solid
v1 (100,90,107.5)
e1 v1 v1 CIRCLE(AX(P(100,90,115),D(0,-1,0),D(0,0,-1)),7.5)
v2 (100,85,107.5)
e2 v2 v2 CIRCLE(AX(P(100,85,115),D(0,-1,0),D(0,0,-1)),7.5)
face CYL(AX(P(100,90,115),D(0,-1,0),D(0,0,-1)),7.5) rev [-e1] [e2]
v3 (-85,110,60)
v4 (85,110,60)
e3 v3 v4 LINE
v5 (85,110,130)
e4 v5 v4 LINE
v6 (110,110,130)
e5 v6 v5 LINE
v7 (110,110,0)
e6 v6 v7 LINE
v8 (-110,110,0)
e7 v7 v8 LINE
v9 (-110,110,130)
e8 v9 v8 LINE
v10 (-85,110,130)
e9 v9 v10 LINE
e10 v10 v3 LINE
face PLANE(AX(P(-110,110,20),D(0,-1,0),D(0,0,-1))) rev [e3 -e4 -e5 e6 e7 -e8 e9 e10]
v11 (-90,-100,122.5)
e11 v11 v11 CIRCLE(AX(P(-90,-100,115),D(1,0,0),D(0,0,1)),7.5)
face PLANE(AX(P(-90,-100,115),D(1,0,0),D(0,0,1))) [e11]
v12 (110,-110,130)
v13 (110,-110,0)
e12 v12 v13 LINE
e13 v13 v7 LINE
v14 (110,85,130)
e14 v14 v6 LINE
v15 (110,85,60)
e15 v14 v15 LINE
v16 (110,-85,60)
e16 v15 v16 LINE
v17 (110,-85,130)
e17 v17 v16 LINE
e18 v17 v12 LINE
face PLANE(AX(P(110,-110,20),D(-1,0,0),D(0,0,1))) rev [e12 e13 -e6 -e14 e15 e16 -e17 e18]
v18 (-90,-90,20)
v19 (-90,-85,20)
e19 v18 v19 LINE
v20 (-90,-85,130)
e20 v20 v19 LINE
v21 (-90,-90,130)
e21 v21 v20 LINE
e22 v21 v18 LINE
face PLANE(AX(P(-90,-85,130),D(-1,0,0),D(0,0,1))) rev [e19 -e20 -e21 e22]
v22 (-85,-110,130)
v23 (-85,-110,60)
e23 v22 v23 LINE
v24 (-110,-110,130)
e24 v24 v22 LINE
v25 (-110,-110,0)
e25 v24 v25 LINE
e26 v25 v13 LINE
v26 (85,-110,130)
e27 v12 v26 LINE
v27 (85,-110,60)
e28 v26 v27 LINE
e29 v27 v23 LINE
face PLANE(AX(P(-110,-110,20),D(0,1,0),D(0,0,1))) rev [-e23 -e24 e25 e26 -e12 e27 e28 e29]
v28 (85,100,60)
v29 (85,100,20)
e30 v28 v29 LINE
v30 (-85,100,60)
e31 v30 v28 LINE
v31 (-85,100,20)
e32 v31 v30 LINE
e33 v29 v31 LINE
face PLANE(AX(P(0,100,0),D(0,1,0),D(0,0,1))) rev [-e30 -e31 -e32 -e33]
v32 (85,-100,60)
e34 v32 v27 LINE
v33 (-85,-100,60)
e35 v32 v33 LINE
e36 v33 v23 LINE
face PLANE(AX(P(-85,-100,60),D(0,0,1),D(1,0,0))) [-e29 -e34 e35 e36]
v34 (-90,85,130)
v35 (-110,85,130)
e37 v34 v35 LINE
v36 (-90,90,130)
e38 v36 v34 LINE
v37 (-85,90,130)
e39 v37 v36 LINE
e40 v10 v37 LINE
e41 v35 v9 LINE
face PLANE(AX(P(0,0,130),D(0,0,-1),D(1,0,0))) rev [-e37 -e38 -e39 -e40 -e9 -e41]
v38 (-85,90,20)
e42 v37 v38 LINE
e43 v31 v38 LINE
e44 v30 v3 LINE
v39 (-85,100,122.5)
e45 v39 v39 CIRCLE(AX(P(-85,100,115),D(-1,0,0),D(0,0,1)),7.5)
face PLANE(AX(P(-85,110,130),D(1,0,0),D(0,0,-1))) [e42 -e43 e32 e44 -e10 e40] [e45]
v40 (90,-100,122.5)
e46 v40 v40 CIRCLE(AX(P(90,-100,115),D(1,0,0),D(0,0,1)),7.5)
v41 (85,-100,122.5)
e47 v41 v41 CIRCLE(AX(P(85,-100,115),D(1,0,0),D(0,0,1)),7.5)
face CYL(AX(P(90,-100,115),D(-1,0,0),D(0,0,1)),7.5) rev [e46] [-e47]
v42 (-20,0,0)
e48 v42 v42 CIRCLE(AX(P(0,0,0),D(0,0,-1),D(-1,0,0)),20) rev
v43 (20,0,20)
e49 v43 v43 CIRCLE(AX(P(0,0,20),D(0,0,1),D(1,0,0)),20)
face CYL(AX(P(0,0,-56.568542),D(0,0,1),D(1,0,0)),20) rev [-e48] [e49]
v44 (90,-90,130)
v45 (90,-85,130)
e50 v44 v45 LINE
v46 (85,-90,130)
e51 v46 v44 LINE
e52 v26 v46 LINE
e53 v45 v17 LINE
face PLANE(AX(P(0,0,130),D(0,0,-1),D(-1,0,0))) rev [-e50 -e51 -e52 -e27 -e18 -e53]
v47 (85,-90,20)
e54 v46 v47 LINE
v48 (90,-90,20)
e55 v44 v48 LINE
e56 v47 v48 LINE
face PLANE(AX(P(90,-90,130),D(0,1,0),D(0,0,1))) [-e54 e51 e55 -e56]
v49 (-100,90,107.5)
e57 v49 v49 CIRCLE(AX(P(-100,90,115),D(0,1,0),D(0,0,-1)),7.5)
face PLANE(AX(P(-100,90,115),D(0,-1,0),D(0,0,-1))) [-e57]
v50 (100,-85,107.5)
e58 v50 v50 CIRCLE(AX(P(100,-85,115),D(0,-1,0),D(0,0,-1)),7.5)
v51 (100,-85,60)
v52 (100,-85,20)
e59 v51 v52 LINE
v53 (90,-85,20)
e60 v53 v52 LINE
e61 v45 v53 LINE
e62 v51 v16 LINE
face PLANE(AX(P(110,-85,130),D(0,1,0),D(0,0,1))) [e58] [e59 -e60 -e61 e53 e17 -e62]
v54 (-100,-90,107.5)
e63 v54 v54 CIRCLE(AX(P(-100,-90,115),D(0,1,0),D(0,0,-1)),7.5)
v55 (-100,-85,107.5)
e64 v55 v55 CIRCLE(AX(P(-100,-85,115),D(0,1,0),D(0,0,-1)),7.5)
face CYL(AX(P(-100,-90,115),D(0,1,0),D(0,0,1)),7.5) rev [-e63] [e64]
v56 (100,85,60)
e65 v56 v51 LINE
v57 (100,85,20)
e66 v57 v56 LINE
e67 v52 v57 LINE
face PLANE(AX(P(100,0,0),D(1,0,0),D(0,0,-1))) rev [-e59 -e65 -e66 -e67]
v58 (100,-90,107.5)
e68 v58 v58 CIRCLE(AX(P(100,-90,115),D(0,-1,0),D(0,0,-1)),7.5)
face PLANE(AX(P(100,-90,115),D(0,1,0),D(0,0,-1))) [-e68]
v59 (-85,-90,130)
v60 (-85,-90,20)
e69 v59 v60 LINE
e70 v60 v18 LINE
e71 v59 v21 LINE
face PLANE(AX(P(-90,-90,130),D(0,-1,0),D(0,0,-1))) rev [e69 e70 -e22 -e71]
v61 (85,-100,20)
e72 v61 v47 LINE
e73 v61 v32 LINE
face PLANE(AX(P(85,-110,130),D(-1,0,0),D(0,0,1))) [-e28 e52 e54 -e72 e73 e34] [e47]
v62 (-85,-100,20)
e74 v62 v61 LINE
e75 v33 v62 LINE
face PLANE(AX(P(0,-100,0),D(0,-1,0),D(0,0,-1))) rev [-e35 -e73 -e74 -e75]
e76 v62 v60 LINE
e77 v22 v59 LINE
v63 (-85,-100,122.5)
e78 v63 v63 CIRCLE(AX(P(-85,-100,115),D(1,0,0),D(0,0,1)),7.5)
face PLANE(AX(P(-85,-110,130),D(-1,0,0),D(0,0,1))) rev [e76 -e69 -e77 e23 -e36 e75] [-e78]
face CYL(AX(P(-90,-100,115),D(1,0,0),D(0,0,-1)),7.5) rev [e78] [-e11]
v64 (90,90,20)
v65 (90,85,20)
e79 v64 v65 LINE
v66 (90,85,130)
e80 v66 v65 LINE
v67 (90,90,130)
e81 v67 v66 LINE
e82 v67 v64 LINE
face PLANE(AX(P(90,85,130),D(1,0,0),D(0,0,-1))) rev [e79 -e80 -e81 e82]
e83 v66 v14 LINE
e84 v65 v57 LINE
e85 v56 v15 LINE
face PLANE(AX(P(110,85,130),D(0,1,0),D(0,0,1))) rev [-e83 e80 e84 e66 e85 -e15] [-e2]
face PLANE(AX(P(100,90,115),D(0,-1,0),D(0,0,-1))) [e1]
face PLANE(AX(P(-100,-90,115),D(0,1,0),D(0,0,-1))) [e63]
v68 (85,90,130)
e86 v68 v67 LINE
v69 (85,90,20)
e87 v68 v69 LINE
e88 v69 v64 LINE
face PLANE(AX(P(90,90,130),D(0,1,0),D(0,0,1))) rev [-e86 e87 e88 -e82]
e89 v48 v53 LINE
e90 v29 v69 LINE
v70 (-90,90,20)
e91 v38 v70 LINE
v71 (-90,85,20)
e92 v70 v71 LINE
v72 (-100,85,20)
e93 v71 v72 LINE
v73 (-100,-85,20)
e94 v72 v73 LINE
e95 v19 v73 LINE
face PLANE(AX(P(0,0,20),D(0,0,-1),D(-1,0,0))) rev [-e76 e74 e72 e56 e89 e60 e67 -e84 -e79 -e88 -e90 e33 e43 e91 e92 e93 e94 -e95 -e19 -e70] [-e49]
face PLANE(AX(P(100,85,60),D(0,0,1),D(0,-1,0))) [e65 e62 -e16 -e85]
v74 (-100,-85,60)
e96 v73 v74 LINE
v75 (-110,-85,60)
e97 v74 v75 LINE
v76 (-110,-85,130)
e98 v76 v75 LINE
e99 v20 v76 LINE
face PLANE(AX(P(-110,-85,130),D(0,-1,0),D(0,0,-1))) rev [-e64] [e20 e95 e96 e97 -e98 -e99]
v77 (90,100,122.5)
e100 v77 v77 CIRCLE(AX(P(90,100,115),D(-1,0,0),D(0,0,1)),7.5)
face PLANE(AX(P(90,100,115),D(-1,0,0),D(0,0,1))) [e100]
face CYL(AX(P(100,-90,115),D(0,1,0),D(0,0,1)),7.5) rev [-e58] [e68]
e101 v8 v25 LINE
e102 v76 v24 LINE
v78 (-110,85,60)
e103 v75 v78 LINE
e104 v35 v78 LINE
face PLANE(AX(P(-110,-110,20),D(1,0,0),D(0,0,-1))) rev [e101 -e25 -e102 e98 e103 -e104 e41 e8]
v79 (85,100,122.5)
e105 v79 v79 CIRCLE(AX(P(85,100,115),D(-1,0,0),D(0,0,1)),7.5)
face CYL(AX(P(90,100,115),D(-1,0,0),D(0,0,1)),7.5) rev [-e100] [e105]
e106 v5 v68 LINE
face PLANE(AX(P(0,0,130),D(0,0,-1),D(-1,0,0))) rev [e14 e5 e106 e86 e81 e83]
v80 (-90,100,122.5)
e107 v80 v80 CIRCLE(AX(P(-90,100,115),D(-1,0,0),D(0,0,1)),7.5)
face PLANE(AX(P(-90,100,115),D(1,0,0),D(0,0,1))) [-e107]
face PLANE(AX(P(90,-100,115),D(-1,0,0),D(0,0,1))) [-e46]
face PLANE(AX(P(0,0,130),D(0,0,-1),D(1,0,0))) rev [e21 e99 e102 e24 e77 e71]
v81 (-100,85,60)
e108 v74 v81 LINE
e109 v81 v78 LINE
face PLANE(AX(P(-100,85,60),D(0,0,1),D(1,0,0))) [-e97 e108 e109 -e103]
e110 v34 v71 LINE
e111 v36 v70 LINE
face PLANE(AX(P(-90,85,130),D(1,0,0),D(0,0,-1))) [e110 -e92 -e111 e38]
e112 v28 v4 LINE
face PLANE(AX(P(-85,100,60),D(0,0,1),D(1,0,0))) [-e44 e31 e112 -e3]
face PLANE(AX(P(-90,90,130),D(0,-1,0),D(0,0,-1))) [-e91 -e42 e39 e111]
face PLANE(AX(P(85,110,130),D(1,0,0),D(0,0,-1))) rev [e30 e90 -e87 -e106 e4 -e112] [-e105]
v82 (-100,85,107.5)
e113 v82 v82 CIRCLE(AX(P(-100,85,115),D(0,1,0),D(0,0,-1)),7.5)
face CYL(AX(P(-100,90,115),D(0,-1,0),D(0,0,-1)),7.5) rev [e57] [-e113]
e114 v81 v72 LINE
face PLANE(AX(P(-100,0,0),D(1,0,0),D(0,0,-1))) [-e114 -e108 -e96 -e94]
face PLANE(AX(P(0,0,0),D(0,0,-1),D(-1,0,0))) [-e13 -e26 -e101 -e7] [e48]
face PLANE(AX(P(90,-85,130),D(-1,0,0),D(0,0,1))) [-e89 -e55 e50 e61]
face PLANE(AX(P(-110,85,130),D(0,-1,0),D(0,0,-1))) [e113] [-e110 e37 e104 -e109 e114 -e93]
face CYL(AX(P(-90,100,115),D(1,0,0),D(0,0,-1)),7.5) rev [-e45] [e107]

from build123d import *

# Parameters (mm, degrees)
SKETCH_1_W          = 220
SKETCH_1_H          = 220
EXTRUDE_1_DEPTH     = 20
EXTRUDE_3_DEPTH     = 110
SKETCH_4_R          = 7.5
CUT_EXTRUDE_2_DEPTH = 5
SKETCH_7_R          = 7.5
CUT_EXTRUDE_3_DEPTH = 5
SKETCH_10_W         = 40
SKETCH_10_H         = 170
EXTRUDE_5_DEPTH     = 10
SKETCH_11_W         = 170
SKETCH_11_H         = 40
EXTRUDE_6_DEPTH     = 10
SKETCH_12_W         = 40
SKETCH_12_H         = 170
EXTRUDE_7_DEPTH     = 10
SKETCH_13_W         = 170
SKETCH_13_H         = 40
EXTRUDE_8_DEPTH     = 10
SKETCH_16_R         = 20
CUT_EXTRUDE_6_DEPTH = 20


# Read off the part's stored shape, not the designer's step: 镜向2, 镜向5
with BuildPart() as part:
    # 草图1 → 凸台-拉伸1 (new body)
    with BuildSketch(Plane.XY):
        Rectangle(SKETCH_1_W, SKETCH_1_H)
    extrude(amount=EXTRUDE_1_DEPTH)

    # 草图2 → 凸台-拉伸3 (add)
    with BuildSketch(Plane.XY.offset(20)):
        Polygon((85, 110), (110, 110), (110, 85), (90, 85), (90, 90), (85, 90), align=None)
    extrude(amount=EXTRUDE_3_DEPTH)

    # 草图4 → 切除-拉伸2 (cut)
    with BuildSketch(Plane(origin=(0, 85, 0), x_dir=(-1, 0, 0), z_dir=(0, -1, 0))):
        with Locations(Location((-100, -115, 0), (0, 0, 90))):
            Circle(SKETCH_4_R)
    extrude(amount=-CUT_EXTRUDE_2_DEPTH, mode=Mode.SUBTRACT)

    # 草图7 → 切除-拉伸3 (cut)
    with BuildSketch(Plane.ZY.offset(-85)):
        with Locations((115, 100)):
            Circle(SKETCH_7_R)
    extrude(amount=-CUT_EXTRUDE_3_DEPTH, mode=Mode.SUBTRACT)

    # 镜向2: part across plane


with BuildPart() as part_1:
    add(part.part)
    add(part.part.mirror(Plane(origin=(0, 0, 0), x_dir=(0, 0, 1), z_dir=(1, 0, 0))))

    # 镜向5: part across plane


with BuildPart() as part_2:
    add(part_1.part)
    add(part_1.part.mirror(Plane.ZX))

    # 草图10 → 凸台-拉伸5 (add)
    with BuildSketch(Plane(origin=(110, 0, 0), x_dir=(0, 0, -1), z_dir=(1, 0, 0))):
        with Locations((-40, 0)):
            Rectangle(SKETCH_10_W, SKETCH_10_H)
    extrude(amount=-EXTRUDE_5_DEPTH)

    # 草图11 → 凸台-拉伸6 (add)
    with BuildSketch(Plane.XZ.offset(110)):
        with Locations((0, 40)):
            Rectangle(SKETCH_11_W, SKETCH_11_H)
    extrude(amount=-EXTRUDE_6_DEPTH)

    # 草图12 → 凸台-拉伸7 (add)
    with BuildSketch(Plane.ZY.offset(110)):
        with Locations((40, 0)):
            Rectangle(SKETCH_12_W, SKETCH_12_H)
    extrude(amount=-EXTRUDE_7_DEPTH)

    # 草图13 → 凸台-拉伸8 (add)
    with BuildSketch(Plane(origin=(0, 110, 0), x_dir=(1, 0, 0), z_dir=(0, 1, 0))):
        with Locations((0, -40)):
            Rectangle(SKETCH_13_W, SKETCH_13_H)
    extrude(amount=-EXTRUDE_8_DEPTH)

    # 草图16 → 切除-拉伸6 (cut)
    with BuildSketch(Plane.XY.offset(20)):
        Circle(SKETCH_16_R)
    extrude(amount=-CUT_EXTRUDE_6_DEPTH, mode=Mode.SUBTRACT)


solid = part_2.part
